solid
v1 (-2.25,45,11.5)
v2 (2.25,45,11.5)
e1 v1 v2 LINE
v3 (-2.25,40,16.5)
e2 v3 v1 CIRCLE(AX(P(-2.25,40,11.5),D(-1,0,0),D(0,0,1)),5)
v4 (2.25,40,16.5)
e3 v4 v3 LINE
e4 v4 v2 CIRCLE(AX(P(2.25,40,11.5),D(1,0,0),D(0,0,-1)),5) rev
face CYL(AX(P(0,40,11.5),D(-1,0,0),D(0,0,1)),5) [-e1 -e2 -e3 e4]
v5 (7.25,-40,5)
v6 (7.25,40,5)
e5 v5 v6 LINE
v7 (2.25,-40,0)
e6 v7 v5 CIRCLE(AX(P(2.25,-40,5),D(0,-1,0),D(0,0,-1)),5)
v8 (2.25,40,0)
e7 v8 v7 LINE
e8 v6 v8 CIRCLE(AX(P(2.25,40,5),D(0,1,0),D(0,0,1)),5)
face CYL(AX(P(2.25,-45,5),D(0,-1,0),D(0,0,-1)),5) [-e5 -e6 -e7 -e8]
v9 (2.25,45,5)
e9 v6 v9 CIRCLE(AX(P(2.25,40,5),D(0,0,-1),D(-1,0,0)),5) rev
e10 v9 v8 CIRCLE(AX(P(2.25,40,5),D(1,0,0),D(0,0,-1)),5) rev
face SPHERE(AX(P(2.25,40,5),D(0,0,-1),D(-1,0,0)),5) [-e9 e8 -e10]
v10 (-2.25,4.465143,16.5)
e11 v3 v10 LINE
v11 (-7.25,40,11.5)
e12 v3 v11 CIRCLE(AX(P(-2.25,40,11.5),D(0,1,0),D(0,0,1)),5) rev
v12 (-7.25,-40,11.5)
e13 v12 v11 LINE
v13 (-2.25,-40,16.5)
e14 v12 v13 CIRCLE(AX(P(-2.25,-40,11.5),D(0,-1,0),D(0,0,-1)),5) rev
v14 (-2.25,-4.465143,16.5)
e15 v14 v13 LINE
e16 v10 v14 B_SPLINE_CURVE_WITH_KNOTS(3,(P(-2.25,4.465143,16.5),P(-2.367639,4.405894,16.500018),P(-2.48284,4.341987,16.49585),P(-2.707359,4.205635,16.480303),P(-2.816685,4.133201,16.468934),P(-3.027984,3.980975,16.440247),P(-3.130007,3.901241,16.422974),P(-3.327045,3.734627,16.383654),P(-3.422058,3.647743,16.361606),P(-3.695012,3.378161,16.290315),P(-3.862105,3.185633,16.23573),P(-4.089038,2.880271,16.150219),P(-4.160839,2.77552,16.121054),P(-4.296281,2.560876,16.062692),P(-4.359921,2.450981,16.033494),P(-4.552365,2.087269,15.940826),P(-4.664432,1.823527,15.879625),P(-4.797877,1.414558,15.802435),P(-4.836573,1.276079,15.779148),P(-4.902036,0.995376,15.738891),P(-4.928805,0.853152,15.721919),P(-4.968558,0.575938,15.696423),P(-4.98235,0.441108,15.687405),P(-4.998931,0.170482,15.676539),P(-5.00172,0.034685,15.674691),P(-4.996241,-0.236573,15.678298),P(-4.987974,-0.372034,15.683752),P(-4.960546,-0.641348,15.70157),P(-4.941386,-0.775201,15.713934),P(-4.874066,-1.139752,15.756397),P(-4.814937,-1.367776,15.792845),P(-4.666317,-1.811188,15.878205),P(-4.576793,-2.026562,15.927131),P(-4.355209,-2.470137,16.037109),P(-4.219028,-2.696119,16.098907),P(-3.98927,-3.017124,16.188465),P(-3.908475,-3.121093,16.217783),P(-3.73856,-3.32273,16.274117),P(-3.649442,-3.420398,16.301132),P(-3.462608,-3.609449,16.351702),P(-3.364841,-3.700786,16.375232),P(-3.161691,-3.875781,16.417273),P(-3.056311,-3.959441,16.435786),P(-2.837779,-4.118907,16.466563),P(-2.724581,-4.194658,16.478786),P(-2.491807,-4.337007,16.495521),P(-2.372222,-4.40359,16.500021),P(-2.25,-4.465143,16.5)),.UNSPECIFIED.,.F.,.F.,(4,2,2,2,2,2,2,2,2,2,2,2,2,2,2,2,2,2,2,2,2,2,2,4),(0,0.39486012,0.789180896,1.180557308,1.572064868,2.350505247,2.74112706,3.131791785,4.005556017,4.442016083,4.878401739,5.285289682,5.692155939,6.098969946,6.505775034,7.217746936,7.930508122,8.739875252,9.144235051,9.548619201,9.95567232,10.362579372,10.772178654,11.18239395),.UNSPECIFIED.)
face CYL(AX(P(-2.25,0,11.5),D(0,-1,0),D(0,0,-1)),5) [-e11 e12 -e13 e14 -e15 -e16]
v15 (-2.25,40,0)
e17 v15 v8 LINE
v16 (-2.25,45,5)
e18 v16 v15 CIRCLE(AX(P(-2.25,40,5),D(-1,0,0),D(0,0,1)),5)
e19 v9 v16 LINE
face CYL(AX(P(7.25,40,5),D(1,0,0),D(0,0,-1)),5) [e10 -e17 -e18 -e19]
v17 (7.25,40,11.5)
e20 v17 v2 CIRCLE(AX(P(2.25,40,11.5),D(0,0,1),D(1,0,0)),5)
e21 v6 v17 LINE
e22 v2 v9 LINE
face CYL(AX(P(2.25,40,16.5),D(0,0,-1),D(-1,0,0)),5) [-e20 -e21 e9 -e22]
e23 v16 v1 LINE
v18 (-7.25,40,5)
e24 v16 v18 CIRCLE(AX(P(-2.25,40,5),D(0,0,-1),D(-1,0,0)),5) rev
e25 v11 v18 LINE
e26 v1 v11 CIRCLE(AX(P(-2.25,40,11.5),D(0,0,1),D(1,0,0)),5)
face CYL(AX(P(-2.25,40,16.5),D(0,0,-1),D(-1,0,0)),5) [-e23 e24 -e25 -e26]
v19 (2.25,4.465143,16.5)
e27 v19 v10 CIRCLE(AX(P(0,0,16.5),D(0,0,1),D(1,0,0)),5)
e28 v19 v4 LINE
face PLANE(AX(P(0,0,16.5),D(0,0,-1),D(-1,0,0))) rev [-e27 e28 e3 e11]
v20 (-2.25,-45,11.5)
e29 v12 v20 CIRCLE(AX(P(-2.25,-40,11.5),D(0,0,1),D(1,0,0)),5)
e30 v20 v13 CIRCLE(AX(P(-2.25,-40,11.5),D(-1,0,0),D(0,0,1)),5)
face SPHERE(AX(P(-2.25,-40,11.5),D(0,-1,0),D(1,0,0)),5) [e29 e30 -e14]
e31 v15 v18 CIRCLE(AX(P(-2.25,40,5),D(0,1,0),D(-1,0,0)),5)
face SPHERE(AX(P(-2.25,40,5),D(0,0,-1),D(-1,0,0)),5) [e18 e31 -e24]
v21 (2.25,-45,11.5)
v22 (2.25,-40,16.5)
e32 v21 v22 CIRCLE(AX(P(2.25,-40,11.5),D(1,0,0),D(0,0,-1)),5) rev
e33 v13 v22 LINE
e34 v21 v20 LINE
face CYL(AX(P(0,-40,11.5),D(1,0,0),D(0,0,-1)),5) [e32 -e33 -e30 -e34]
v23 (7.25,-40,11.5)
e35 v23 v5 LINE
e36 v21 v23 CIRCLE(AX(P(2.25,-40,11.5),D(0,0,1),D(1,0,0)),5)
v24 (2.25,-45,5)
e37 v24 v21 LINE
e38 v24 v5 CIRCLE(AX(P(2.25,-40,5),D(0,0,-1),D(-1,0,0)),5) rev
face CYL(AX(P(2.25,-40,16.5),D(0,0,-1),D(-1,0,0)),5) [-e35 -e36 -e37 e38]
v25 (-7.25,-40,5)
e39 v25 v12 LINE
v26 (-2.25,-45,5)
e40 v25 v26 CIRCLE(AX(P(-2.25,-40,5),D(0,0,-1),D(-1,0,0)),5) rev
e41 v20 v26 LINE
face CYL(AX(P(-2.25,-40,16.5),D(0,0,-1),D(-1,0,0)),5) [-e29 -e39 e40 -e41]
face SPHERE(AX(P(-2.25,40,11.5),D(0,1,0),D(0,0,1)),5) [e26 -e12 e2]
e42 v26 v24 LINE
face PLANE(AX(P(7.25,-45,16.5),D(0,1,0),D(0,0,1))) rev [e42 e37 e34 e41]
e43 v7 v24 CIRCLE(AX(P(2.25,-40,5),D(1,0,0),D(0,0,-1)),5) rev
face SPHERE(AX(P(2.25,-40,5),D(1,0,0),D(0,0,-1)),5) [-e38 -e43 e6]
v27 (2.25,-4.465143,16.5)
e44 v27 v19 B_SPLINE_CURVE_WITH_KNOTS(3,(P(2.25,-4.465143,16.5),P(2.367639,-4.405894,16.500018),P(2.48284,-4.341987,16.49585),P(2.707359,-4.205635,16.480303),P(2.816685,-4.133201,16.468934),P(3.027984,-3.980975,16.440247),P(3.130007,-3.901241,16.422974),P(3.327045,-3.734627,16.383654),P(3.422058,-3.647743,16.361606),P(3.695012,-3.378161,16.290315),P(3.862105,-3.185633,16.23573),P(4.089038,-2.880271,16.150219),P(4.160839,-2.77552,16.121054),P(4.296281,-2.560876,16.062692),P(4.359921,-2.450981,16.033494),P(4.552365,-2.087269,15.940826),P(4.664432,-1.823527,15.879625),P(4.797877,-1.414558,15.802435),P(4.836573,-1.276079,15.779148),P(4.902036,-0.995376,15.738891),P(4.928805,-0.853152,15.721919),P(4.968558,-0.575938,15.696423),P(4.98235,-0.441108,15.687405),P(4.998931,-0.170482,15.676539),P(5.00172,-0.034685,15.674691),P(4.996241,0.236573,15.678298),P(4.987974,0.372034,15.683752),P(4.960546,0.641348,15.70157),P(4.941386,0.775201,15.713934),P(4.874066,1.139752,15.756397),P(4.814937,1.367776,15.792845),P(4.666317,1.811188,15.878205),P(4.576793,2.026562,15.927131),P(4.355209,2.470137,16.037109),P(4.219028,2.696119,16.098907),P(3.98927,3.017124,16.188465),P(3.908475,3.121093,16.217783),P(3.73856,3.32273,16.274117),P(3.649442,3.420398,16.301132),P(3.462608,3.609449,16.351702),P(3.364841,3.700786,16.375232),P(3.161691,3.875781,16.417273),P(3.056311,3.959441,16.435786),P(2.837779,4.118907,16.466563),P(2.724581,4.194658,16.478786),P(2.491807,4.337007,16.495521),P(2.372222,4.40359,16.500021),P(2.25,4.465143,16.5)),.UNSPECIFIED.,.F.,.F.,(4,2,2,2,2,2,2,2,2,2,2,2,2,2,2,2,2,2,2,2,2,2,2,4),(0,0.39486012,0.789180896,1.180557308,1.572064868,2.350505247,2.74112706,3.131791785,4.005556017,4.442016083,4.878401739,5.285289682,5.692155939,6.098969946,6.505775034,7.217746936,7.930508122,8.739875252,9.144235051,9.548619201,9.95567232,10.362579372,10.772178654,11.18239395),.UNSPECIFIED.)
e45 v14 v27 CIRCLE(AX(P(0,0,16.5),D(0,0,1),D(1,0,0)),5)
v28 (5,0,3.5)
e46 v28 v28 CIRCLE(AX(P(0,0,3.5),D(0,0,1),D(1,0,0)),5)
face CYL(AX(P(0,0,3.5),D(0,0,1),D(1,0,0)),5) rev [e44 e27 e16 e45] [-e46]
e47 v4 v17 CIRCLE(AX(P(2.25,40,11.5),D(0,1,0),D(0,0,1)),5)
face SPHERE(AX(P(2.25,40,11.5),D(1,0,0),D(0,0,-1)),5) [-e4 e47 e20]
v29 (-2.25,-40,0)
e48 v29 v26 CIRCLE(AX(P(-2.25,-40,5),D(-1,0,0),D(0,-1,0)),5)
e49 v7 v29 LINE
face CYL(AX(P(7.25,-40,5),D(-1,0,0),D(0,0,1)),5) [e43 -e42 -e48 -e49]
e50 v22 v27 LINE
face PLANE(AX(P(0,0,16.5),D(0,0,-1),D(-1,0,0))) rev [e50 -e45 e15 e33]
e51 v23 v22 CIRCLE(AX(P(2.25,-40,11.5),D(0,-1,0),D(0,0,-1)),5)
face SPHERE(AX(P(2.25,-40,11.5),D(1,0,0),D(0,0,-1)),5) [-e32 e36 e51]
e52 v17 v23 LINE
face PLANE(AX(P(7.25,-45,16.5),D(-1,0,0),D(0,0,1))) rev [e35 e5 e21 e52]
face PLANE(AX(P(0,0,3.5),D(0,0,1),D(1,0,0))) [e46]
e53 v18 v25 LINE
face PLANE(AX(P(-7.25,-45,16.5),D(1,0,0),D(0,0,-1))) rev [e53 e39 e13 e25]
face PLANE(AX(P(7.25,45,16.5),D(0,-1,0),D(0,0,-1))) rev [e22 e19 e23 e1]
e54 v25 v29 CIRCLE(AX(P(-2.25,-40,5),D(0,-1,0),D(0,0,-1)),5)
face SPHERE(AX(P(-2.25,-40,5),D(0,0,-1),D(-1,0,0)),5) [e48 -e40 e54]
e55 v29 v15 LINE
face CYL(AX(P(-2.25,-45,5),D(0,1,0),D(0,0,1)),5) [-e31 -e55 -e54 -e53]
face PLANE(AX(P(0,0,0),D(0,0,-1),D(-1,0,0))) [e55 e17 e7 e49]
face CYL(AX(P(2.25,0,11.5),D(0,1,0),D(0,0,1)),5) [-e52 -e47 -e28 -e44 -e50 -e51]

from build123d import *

# Parameters (mm, degrees)
SKETCH7_W           = 90
SKETCH7_H           = 14.5
BOSS_EXTRUDE1_DEPTH = 16.5
SKETCH8_R           = 5
CUT_EXTRUDE2_DEPTH  = 13
FILLET1_R           = 5


with BuildPart() as part:
    # Sketch7 → Boss-Extrude1 (new body)
    with BuildSketch(Plane(origin=(0, 0, 0), x_dir=(0, 1, 0), z_dir=(0, 0, 1))):
        Rectangle(SKETCH7_W, SKETCH7_H)
    extrude(amount=BOSS_EXTRUDE1_DEPTH)

    # Sketch8 → Cut-Extrude2 (cut)
    with BuildSketch(Plane(origin=(0, 0, 16.5), x_dir=(0, -1, 0), z_dir=(0, 0, 1))):
        with Locations(Location((0, 0, 0), (0, 0, 90))):
            Circle(SKETCH8_R)
    extrude(amount=-CUT_EXTRUDE2_DEPTH, mode=Mode.SUBTRACT)

    # Fillet1
    # the kernel refuses this fillet: 5 mm, written as the material it takes off along each edge
    with BuildSketch(Plane(origin=(-2.25, -40, 11.5), x_dir=(0, 0, 1), z_dir=(0, -1, 0))) as fillet1_piece_1_section:
        Polygon((0, 0), (FILLET1_R, 0), (FILLET1_R, FILLET1_R), (0, FILLET1_R), align=None)
    fillet1_piece_1 = extrude(amount=FILLET1_R, mode=Mode.PRIVATE)
    fillet1_piece_1 = fillet1_piece_1 - Plane(origin=(-2.25, -40, 11.5), x_dir=(0.7071067811865475, 0, -0.7071067811865475), z_dir=(0, -1, 0)) * Sphere(FILLET1_R, mode=Mode.PRIVATE)
    add(fillet1_piece_1, mode=Mode.SUBTRACT)
    with BuildSketch(Plane(origin=(2.25, -40, 11.5), x_dir=(0, -1, 0), z_dir=(1, 0, 0))) as fillet1_piece_2_section:
        Polygon((0, 0), (FILLET1_R, 0), (FILLET1_R, -FILLET1_R), (0, -FILLET1_R), align=None)
    fillet1_piece_2 = extrude(amount=FILLET1_R, mode=Mode.PRIVATE)
    fillet1_piece_2 = fillet1_piece_2 - Plane(origin=(2.25, -40, 11.5), x_dir=(0, 0.7071067811865475, -0.7071067811865475), z_dir=(1, 0, 0)) * Sphere(FILLET1_R, mode=Mode.PRIVATE)
    add(fillet1_piece_2, mode=Mode.SUBTRACT)
    with BuildSketch(Plane(origin=(2.25, 40, 11.5), x_dir=(0, 1, 0), z_dir=(1, 0, 0))) as fillet1_piece_3_section:
        Polygon((0, 0), (FILLET1_R, 0), (FILLET1_R, FILLET1_R), (0, FILLET1_R), align=None)
    fillet1_piece_3 = extrude(amount=FILLET1_R, mode=Mode.PRIVATE)
    fillet1_piece_3 = fillet1_piece_3 - Plane(origin=(2.25, 40, 11.5), x_dir=(0, -0.7071067811865475, -0.7071067811865475), z_dir=(1, 0, 0)) * Sphere(FILLET1_R, mode=Mode.PRIVATE)
    add(fillet1_piece_3, mode=Mode.SUBTRACT)
    with BuildSketch(Plane(origin=(-2.25, 40, 11.5), x_dir=(0, 0, 1), z_dir=(0, 1, 0))) as fillet1_piece_4_section:
        Polygon((0, 0), (FILLET1_R, 0), (FILLET1_R, -FILLET1_R), (0, -FILLET1_R), align=None)
    fillet1_piece_4 = extrude(amount=FILLET1_R, mode=Mode.PRIVATE)
    fillet1_piece_4 = fillet1_piece_4 - Plane(origin=(-2.25, 40, 11.5), x_dir=(0.7071067811865475, 0, -0.7071067811865475), z_dir=(0, 1, 0)) * Sphere(FILLET1_R, mode=Mode.PRIVATE)
    add(fillet1_piece_4, mode=Mode.SUBTRACT)
    with BuildSketch(Plane(origin=(2.25, -40, 5), x_dir=(0, -1, 0), z_dir=(1, 0, 0))) as fillet1_piece_5_section:
        Polygon((0, 0), (FILLET1_R, 0), (FILLET1_R, FILLET1_R), (0, FILLET1_R), align=None)
    fillet1_piece_5 = extrude(amount=FILLET1_R, mode=Mode.PRIVATE)
    fillet1_piece_5 = fillet1_piece_5 - Plane(origin=(2.25, -40, 5), x_dir=(0, 0.7071067811865475, 0.7071067811865475), z_dir=(1, 0, 0)) * Sphere(FILLET1_R, mode=Mode.PRIVATE)
    add(fillet1_piece_5, mode=Mode.SUBTRACT)
    with BuildSketch(Plane(origin=(2.25, 40, 5), x_dir=(0, 1, 0), z_dir=(1, 0, 0))) as fillet1_piece_6_section:
        Polygon((0, 0), (FILLET1_R, 0), (FILLET1_R, -FILLET1_R), (0, -FILLET1_R), align=None)
    fillet1_piece_6 = extrude(amount=FILLET1_R, mode=Mode.PRIVATE)
    fillet1_piece_6 = fillet1_piece_6 - Plane(origin=(2.25, 40, 5), x_dir=(0, -0.7071067811865475, 0.7071067811865475), z_dir=(1, 0, 0)) * Sphere(FILLET1_R, mode=Mode.PRIVATE)
    add(fillet1_piece_6, mode=Mode.SUBTRACT)
    with BuildSketch(Plane(origin=(-2.25, -40, 5), x_dir=(0, 0, -1), z_dir=(0, -1, 0))) as fillet1_piece_7_section:
        Polygon((0, 0), (FILLET1_R, 0), (FILLET1_R, -FILLET1_R), (0, -FILLET1_R), align=None)
    fillet1_piece_7 = extrude(amount=FILLET1_R, mode=Mode.PRIVATE)
    fillet1_piece_7 = fillet1_piece_7 - Plane(origin=(-2.25, -40, 5), x_dir=(0.7071067811865475, 0, 0.7071067811865475), z_dir=(0, -1, 0)) * Sphere(FILLET1_R, mode=Mode.PRIVATE)
    add(fillet1_piece_7, mode=Mode.SUBTRACT)
    with BuildSketch(Plane(origin=(-2.25, 40, 5), x_dir=(0, 0, -1), z_dir=(0, 1, 0))) as fillet1_piece_8_section:
        Polygon((0, 0), (FILLET1_R, 0), (FILLET1_R, FILLET1_R), (0, FILLET1_R), align=None)
    fillet1_piece_8 = extrude(amount=FILLET1_R, mode=Mode.PRIVATE)
    fillet1_piece_8 = fillet1_piece_8 - Plane(origin=(-2.25, 40, 5), x_dir=(0.7071067811865475, 0, 0.7071067811865475), z_dir=(0, 1, 0)) * Sphere(FILLET1_R, mode=Mode.PRIVATE)
    add(fillet1_piece_8, mode=Mode.SUBTRACT)
    with BuildSketch(Plane(origin=(-2.25, -45, 16.5), x_dir=(0, 0, -1), z_dir=(1, 0, 0)), Plane(origin=(2.25, 45, 16.5), x_dir=(0, 0, -1), z_dir=(-1, 0, 0))) as fillet1_piece_9:
        with BuildLine():
            CenterArc((FILLET1_R, FILLET1_R), FILLET1_R, 180, 90)
            Line((0, FILLET1_R), (0, 0))
            Line((0, 0), (FILLET1_R, 0))
        make_face()
    extrude(amount=4.5, mode=Mode.SUBTRACT)
    with BuildSketch(Plane(origin=(7.25, -40, 16.5), x_dir=(0, 0, -1), z_dir=(0, 1, 0)), Plane(origin=(-7.25, 40, 0), x_dir=(1, 0, 0), z_dir=(0, -1, 0))) as fillet1_piece_10:
        with BuildLine():
            CenterArc((FILLET1_R, FILLET1_R), FILLET1_R, 180, 90)
            Line((0, FILLET1_R), (0, 0))
            Line((0, 0), (FILLET1_R, 0))
        make_face()
    extrude(amount=80, mode=Mode.SUBTRACT)
    with BuildSketch(Plane(origin=(7.25, -40, 0), x_dir=(0, 0, 1), z_dir=(0, 1, 0)), Plane(origin=(-7.25, 40, 16.5), x_dir=(1, 0, 0), z_dir=(0, -1, 0))) as fillet1_piece_11:
        with BuildLine():
            CenterArc((FILLET1_R, -FILLET1_R), FILLET1_R, 90, 90)
            Line((0, -FILLET1_R), (0, 0))
            Line((0, 0), (FILLET1_R, 0))
        make_face()
    extrude(amount=80, mode=Mode.SUBTRACT)
    with BuildSketch(Plane(origin=(-2.25, -45, 0), x_dir=(0, 0, 1), z_dir=(1, 0, 0)), Plane(origin=(2.25, 45, 0), x_dir=(0, 0, 1), z_dir=(-1, 0, 0))) as fillet1_piece_12:
        with BuildLine():
            CenterArc((FILLET1_R, -FILLET1_R), FILLET1_R, 90, 90)
            Line((0, -FILLET1_R), (0, 0))
            Line((0, 0), (FILLET1_R, 0))
        make_face()
    extrude(amount=4.5, mode=Mode.SUBTRACT)
    with BuildSketch(Plane(origin=(7.25, 45, 5), x_dir=(0, -1, 0), z_dir=(0, 0, 1)), Plane(origin=(-7.25, 45, 5), x_dir=(1, 0, 0), z_dir=(0, 0, 1))) as fillet1_piece_13:
        with BuildLine():
            CenterArc((FILLET1_R, -FILLET1_R), FILLET1_R, 90, 90)
            Line((0, -FILLET1_R), (0, 0))
            Line((0, 0), (FILLET1_R, 0))
        make_face()
    extrude(amount=6.5, mode=Mode.SUBTRACT)
    with BuildSketch(Plane(origin=(7.25, -45, 5), x_dir=(0, 1, 0), z_dir=(0, 0, 1)), Plane(origin=(-7.25, -45, 5), x_dir=(1, 0, 0), z_dir=(0, 0, 1))) as fillet1_piece_14:
        with BuildLine():
            CenterArc((FILLET1_R, FILLET1_R), FILLET1_R, 180, 90)
            Line((0, FILLET1_R), (0, 0))
            Line((0, 0), (FILLET1_R, 0))
        make_face()
    extrude(amount=6.5, mode=Mode.SUBTRACT)


solid = part.part
